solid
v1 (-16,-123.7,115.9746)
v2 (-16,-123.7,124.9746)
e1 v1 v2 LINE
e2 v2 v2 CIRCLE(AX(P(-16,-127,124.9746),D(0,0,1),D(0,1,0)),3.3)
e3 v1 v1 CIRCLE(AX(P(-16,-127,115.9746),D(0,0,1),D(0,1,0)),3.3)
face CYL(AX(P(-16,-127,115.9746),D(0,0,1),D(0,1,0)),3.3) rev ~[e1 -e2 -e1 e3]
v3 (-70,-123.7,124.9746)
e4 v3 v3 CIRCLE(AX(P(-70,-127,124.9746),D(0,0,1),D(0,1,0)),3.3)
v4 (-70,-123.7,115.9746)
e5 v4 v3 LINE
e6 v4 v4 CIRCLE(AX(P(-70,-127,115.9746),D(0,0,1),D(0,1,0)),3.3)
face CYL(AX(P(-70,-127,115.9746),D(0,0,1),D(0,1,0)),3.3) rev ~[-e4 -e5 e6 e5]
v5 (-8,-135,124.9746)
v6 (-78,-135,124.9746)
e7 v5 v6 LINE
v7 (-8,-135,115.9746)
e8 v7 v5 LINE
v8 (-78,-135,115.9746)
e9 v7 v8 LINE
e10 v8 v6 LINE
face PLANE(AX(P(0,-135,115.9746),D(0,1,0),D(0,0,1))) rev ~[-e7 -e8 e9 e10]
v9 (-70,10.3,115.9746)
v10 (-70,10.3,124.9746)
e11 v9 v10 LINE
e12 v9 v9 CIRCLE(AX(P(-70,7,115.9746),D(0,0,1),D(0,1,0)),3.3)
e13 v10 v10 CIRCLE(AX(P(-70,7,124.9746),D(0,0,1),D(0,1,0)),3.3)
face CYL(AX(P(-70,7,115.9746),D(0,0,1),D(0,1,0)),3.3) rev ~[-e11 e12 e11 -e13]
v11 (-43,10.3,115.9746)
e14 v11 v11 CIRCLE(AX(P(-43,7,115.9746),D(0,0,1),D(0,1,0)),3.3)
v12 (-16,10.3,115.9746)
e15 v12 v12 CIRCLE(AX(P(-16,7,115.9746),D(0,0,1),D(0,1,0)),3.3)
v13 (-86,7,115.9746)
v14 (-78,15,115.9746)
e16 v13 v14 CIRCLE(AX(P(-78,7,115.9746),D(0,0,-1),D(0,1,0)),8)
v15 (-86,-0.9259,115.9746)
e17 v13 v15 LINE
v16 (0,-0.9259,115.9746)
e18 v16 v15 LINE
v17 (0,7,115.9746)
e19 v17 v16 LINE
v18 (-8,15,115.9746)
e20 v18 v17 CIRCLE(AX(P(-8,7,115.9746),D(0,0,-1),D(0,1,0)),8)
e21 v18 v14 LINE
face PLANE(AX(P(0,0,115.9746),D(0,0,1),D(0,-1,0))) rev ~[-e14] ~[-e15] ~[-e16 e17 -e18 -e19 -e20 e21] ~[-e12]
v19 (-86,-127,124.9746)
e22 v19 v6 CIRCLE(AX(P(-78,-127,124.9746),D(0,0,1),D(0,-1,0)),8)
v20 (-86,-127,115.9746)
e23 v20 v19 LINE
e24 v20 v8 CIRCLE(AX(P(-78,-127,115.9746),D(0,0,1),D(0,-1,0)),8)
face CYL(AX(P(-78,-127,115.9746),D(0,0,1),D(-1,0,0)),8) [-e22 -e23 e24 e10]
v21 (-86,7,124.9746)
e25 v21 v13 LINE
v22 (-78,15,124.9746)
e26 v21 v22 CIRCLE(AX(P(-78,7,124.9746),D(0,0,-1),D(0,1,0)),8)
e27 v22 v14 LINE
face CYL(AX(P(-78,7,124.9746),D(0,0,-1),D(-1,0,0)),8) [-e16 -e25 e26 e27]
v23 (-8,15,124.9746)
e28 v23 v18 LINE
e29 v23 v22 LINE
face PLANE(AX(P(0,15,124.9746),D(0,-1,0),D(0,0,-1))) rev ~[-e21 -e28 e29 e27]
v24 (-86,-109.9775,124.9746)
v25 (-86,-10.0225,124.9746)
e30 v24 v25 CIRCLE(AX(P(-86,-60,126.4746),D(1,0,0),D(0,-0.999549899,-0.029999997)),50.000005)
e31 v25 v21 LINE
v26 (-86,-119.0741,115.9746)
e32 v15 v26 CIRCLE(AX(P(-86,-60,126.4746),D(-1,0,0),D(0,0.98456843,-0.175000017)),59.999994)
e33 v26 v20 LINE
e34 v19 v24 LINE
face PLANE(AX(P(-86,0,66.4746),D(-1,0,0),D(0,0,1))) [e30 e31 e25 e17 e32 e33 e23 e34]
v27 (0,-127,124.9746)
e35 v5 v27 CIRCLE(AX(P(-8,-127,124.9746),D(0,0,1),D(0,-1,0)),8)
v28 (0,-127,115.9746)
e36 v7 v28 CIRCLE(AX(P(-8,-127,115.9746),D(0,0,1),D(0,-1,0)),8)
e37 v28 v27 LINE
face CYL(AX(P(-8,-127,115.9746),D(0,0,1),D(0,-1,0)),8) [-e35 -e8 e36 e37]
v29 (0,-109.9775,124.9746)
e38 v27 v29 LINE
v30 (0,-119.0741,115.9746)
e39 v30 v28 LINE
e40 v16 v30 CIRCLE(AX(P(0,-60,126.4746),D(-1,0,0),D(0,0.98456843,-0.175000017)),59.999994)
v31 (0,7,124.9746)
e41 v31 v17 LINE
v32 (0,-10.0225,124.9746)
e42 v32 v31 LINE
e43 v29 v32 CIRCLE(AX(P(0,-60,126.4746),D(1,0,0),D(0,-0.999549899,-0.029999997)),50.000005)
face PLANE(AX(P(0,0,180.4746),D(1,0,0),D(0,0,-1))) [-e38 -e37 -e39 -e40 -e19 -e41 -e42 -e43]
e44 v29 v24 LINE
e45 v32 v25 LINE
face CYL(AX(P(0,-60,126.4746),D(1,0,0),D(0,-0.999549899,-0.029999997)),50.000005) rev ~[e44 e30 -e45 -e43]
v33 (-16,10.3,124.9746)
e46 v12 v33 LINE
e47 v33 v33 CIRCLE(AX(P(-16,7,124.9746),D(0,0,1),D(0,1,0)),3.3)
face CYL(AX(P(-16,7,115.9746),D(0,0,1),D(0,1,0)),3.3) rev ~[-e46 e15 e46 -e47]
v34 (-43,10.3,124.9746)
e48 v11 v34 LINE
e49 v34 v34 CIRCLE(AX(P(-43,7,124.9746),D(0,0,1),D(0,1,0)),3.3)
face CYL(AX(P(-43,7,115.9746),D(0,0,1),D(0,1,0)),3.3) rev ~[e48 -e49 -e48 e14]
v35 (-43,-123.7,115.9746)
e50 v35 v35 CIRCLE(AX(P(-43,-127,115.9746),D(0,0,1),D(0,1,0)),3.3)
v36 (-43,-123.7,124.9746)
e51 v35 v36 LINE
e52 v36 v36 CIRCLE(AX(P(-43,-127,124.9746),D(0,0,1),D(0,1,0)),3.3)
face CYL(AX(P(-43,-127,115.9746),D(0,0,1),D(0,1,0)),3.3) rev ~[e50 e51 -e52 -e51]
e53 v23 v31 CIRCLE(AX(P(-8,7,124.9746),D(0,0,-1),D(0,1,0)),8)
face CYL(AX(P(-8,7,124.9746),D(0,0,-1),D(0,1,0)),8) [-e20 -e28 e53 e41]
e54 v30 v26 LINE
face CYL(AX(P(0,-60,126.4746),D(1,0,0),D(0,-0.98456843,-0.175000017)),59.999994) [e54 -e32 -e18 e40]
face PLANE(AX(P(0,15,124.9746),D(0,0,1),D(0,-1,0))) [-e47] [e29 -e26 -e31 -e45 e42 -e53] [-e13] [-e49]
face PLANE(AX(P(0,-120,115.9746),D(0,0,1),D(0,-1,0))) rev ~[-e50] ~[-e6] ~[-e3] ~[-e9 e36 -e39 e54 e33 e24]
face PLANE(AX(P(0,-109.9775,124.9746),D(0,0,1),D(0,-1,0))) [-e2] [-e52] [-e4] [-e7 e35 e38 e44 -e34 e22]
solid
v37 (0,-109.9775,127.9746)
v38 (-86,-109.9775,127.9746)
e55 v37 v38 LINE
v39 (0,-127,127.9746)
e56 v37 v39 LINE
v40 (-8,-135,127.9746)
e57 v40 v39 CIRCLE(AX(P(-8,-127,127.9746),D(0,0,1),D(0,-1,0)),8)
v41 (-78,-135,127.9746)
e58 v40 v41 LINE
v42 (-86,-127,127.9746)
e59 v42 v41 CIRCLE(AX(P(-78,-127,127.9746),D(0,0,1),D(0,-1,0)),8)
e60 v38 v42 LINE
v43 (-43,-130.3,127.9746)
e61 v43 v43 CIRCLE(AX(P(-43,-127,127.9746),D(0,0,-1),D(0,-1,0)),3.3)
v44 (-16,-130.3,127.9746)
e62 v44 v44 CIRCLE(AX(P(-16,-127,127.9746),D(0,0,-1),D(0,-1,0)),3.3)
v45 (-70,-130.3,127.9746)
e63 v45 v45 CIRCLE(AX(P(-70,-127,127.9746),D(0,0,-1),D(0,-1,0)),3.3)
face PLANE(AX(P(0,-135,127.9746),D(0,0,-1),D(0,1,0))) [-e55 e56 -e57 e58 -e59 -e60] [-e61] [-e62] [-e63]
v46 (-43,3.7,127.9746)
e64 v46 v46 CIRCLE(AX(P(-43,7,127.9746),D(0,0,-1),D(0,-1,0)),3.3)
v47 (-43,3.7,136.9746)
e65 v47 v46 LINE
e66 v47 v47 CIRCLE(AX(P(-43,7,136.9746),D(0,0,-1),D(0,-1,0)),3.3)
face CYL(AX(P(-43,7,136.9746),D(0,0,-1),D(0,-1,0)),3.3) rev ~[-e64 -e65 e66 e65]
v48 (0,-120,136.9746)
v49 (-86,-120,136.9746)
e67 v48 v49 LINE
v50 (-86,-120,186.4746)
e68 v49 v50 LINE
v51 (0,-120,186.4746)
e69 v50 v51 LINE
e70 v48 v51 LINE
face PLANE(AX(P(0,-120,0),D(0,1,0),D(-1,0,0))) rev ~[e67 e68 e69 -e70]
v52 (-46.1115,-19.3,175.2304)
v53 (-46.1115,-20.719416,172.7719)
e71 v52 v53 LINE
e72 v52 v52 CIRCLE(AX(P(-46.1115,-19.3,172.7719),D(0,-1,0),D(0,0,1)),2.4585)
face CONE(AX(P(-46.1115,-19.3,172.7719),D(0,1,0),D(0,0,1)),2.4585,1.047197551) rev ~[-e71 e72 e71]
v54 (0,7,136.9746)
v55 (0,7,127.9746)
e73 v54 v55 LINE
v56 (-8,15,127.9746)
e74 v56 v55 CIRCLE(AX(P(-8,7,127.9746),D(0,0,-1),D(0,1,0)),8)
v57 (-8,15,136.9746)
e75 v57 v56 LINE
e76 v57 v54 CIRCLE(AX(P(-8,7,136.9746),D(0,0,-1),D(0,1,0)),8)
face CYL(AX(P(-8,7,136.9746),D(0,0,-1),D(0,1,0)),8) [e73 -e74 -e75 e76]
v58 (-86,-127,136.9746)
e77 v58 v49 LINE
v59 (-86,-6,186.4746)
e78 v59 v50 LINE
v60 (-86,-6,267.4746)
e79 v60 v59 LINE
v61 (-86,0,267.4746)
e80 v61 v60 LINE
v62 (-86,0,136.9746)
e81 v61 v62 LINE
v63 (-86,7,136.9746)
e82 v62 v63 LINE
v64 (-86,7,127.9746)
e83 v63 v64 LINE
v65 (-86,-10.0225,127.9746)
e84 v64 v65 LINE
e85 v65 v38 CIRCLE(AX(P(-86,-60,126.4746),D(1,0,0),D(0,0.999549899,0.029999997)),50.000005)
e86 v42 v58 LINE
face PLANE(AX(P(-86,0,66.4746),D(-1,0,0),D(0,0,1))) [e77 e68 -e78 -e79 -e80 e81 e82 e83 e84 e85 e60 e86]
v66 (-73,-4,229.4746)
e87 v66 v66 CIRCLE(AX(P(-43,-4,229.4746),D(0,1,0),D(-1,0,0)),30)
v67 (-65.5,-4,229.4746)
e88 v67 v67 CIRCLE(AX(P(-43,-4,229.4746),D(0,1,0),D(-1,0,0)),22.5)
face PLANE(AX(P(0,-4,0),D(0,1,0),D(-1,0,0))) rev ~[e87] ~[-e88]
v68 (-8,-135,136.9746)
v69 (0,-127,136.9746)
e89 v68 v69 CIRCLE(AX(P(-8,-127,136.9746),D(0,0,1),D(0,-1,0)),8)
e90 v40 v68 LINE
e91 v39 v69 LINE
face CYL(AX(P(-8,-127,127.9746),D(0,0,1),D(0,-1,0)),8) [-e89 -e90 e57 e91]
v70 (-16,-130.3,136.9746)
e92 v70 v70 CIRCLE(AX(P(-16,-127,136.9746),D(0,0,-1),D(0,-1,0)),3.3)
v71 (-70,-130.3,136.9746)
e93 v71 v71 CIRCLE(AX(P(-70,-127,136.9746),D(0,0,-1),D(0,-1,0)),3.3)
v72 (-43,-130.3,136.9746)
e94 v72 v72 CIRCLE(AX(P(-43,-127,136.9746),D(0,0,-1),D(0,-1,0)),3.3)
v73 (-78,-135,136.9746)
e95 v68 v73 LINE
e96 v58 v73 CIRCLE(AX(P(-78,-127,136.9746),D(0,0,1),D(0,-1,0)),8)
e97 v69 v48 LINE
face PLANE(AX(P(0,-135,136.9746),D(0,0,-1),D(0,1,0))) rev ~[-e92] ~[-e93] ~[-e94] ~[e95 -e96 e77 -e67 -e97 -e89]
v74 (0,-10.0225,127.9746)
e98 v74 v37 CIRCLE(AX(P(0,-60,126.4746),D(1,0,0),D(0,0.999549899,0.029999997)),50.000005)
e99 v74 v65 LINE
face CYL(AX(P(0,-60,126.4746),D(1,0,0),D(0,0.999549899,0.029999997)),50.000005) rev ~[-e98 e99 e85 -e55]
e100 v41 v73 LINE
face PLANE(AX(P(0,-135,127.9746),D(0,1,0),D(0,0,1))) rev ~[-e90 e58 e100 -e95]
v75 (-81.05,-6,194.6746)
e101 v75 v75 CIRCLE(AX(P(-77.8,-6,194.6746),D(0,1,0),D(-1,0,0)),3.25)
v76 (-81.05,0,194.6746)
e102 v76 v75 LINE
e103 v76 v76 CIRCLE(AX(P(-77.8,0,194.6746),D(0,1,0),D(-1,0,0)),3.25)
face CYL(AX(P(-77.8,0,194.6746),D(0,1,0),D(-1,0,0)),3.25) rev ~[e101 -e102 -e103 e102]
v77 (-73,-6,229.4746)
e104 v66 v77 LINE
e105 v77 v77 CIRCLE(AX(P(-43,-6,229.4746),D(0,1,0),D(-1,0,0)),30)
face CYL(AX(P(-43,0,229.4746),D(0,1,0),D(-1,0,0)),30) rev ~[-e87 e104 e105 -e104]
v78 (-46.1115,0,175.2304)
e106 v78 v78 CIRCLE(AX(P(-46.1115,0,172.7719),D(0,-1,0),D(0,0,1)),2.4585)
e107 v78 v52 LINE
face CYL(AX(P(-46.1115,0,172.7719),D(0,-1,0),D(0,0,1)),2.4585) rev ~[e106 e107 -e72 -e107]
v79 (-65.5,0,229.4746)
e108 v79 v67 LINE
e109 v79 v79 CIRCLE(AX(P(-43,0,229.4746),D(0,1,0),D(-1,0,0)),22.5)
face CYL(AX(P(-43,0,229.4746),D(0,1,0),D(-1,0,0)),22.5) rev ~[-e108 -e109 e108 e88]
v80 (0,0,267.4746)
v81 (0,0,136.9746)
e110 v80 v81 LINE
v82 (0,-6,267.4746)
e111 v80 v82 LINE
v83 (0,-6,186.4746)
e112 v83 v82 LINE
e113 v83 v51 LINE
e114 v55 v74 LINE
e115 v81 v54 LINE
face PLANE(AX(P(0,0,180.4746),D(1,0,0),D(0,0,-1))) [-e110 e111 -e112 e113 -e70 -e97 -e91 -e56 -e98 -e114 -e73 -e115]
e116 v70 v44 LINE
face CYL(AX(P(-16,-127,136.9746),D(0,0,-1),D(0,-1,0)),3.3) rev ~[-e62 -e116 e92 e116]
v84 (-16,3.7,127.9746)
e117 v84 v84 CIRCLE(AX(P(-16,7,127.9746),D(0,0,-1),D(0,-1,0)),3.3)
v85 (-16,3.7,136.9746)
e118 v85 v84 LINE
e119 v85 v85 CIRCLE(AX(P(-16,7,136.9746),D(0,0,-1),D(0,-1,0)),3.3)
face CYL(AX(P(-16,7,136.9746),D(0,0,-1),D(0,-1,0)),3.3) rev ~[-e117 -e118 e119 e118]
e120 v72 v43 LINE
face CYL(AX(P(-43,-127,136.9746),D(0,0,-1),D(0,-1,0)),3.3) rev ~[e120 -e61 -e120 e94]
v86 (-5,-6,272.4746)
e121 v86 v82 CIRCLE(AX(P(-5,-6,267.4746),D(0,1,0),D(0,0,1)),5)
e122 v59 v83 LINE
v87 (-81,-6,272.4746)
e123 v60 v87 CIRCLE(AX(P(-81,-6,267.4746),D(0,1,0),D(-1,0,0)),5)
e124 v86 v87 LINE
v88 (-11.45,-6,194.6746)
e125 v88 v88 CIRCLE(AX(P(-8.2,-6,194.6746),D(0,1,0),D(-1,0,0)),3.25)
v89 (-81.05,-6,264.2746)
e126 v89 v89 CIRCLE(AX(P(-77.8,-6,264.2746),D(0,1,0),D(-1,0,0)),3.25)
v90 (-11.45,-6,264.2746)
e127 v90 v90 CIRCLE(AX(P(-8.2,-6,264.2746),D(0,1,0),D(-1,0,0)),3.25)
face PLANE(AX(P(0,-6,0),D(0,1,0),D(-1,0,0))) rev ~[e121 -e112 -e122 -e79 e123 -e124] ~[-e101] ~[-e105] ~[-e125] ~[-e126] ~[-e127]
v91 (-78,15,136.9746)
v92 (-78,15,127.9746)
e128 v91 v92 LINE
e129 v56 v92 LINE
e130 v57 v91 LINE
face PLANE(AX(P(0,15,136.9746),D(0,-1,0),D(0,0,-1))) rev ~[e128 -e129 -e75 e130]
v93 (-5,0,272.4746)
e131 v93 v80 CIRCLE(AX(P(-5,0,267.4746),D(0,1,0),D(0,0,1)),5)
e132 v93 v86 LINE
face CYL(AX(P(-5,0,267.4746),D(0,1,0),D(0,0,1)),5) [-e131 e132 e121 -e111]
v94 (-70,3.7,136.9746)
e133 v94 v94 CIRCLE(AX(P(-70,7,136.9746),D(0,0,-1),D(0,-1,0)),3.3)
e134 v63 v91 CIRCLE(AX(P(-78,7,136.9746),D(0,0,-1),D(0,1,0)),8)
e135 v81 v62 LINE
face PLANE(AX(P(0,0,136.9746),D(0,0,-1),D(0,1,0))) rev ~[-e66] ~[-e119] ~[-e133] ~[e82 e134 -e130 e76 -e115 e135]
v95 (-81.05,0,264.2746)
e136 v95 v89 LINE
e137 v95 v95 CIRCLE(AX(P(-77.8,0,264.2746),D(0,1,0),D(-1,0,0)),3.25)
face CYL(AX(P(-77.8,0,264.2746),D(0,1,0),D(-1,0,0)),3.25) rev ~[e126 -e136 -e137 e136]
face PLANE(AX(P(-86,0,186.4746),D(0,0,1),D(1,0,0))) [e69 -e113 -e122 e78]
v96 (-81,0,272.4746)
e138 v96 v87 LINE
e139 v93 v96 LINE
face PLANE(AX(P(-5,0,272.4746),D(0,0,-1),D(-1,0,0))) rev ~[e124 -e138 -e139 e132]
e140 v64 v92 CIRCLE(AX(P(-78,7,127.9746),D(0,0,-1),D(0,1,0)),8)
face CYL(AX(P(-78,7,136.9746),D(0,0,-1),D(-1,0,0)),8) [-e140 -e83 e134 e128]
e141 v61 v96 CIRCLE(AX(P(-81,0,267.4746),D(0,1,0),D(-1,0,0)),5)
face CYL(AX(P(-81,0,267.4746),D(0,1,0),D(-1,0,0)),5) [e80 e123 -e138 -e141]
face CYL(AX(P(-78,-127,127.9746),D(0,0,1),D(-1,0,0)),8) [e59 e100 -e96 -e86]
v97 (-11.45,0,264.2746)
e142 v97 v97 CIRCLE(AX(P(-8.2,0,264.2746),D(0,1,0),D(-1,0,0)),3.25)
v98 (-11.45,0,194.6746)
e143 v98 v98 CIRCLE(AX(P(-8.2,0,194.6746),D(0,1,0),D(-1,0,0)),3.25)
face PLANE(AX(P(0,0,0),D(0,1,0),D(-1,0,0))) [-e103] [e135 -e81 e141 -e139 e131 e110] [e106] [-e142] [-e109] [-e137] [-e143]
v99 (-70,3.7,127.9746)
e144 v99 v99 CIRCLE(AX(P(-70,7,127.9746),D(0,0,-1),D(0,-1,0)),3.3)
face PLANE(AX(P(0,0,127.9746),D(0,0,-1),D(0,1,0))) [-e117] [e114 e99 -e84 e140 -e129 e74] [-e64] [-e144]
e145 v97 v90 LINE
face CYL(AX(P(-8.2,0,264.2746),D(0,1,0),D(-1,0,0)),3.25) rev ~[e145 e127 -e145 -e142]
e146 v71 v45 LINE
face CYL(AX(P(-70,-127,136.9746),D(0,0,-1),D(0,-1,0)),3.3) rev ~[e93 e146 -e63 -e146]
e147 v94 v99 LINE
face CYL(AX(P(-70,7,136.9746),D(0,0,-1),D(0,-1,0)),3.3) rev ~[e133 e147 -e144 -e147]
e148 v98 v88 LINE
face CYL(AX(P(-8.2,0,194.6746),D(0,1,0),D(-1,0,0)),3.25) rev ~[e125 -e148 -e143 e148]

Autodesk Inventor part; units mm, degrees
ref_plane "YZ Plane" through (0, 0, 0) normal (1, 0, 0) x (0, 1, 0)
ref_plane "XZ Plane" through (0, 0, 0) normal (0, 1, 0) x (-1, 0, 0)
ref_plane "XY Plane" through (0, 0, 0) normal (0, 0, 1) x (1, 0, 0)
sketch "Szkic1" plane through (0, 0, 0) normal (0, 1, 0) x (-1, 0, 0)
  line L0 (5, 272.4746) -> (81, 272.4746)
  line L1 (86, 267.4746) -> (86, 186.4746)
  line L2 (86, 186.4746) -> (0, 186.4746)
  line L3 (0, 186.4746) -> (0, 267.4746)
  line L4 (0, 186.4746) -> (0, 180.4746)
  line L5 (0, 180.4746) -> (86, 180.4746)
  line L6 (86, 180.4746) -> (86, 186.4746)
  line L7 (0, 180.4746) -> (0, 66.4746)
  line L8 (0, 66.4746) -> (86, 66.4746)
  line L9 (86, 66.4746) -> (86, 180.4746)
  circle A0 centre (43, 229.4746) radius 30
  line L10 (77.8, 264.2746) -> (8.2, 194.6746) construction
  line L11 (8.2, 264.2746) -> (77.8, 194.6746) construction
  circle A1 centre (77.8, 264.2746) radius 3.25
  circle A2 centre (8.2, 264.2746) radius 3.25
  circle A3 centre (8.2, 194.6746) radius 3.25
  circle A4 centre (77.8, 194.6746) radius 3.25
  circle A5 centre (43, 229.4746) radius 22.5
  arc A6 (5, 272.4746) -> (0, 267.4746) centre (5, 267.4746) ccw
  arc A7 (86, 267.4746) -> (81, 272.4746) centre (81, 267.4746) ccw
  point P0 (0, 0)
  point P1 (0, 272.4746)
  point P2 (86, 272.4746)
  dimension "d0" = 86
  dimension "d1" = 86
  dimension "d2" = 6
  dimension "d3" = 114
  dimension "d4" = 86
  dimension "d22" = 60
  dimension "d23" = 69.6
  dimension "d24" = 69.6
  dimension "d25" = 6.5
  dimension "d26" = 6.5
  dimension "d27" = 6.5
  dimension "d28" = 6.5
  dimension "d29" = 45
  dimension "d32" = 5
extrude "Wyciągnięcie proste1" add sketch "Szkic1" against normal blind 6 contours L0 A7 L1 L2 L3 A6
extrude "Wyciągnięcie proste2" add sketch "Szkic1" against normal blind 120 contours L2 L6 L5 L4
extrude "Wyciągnięcie proste3" add sketch "Szkic1" against normal blind 120 contours L5 L9 L8 L7
sketch "Szkic3" plane through (0, -120, 186.4746) normal (1, 0, 0) x (0, 0, -1)
  line L0 (49.5, 135) -> (70.5, 135)
  line L1 (49.5, 135) -> (70.5, -15) construction
  line L2 (70.5, 135) -> (49.5, -15) construction
  line L3 (0, 0) -> (120, 0) projected
  line L4 (120, 120) -> (120, 0)
  line L5 (120, 0) -> (0, 0)
  line L6 (0, 0) -> (0, 120)
  line L7 (0, 120) -> (120, 0) construction
  line L8 (120, 120) -> (0, 0) construction
  line L9 (49.5, -15) -> (49.5, 0)
  line L10 (49.5, 120) -> (49.5, 135)
  line L11 (70.5, 135) -> (70.5, 119.0741)
  line L12 (70.5, 0.9259) -> (70.5, -15)
  arc A0 (70.5, 0.9259) -> (70.5, 119.0741) centre (60, 60) ccw
  line L13 (58.5, 135) -> (61.5, 135)
  line L14 (61.5, -15) -> (58.5, 135) construction
  line L15 (58.5, -15) -> (61.5, 135) construction
  line L16 (70.5, -15) -> (61.5, -15)
  line L17 (58.5, -15) -> (49.5, -15)
  line L18 (58.5, -15) -> (58.5, 10.0225)
  line L19 (61.5, 10.0225) -> (61.5, -15)
  line L20 (61.5, 135) -> (61.5, 109.9775)
  line L21 (58.5, 109.9775) -> (58.5, 135)
  arc A1 (61.5, 10.0225) -> (61.5, 109.9775) centre (60, 60) ccw
  arc A2 (58.5, 109.9775) -> (58.5, 10.0225) centre (60, 60) ccw
  line L22 (0, 120) -> (58.5, 120)
  line L23 (61.5, 120) -> (120, 120)
  line L24 (58.5, -15) -> (61.5, -15)
  point P0 (186.4746, 120)
  point P1 (70.5, 0)
  point P2 (61.5, 0)
  point P3 (58.5, 0)
  point P4 (49.5, 0)
  point P5 (70.5, 120)
  point P6 (120, 60)
extrude "Wyciągnięcie proste4" add sketch "Szkic3" against normal blind 86 contours L0 L21 L22 L10 | L0 L11 L23 L20 | L3 L18 L17 L9 | L3 L12 L16 L19
extrude "Wyciągnięcie proste5" cut sketch "Szkic3" against normal blind 86 contours L0 L20 A1 L19 L3 L18 A2 L21 | L23 L4 A0 L11 | L3 L19 L24 L18 | L4 L3 L12 A0
fillet "Zaokrąglenie1" radius 8 8 edges at (-86, 15, 120.4746) (-86, 15, 132.4746) (0, 15, 120.4746) (0, 15, 132.4746) (-86, -135, 120.4746) (-86, -135, 132.4746) (0, -135, 120.4746) (0, -135, 132.4746)
extrude "Wyciągnięcie proste6" add sketch "Szkic1" against normal blind 4 contours A0
sketch "Szkic4" plane through (-86, 0, 136.9746) normal (0, 0, 1) x (1, 0, 0)
  point P0 (70, 7)
hole "Otwór1" at (-16, 7, 136.9746) direction (0, 0, -1) diameter 6.6 depth 9
sketch "Szkic5" plane through (0, -0.9259, 115.9746) normal (0, 0, -1) x (-1, 0, 0)
  point P0 (16, 7.9259)
hole "Otwór2" at (-16, 7, 115.9746) direction (0, 0, 1) diameter 6.6 depth 9
sketch "Szkic6" plane through (-86, 0, 136.9746) normal (0, 0, 1) x (1, 0, 0)
  point P0 (16, 7)
hole "Otwór3" at (-70, 7, 136.9746) direction (0, 0, -1) diameter 6.6 depth 9
sketch "Szkic7" plane through (0, -0.9259, 115.9746) normal (0, 0, -1) x (-1, 0, 0)
  point P0 (70, 7.9259)
hole "Otwór4" at (-70, 7, 115.9746) direction (0, 0, 1) diameter 6.6 depth 9
sketch "Szkic8" plane through (-86, 0, 136.9746) normal (0, 0, 1) x (1, 0, 0)
  point P0 (43, 7)
hole "Otwór5" at (-43, 7, 136.9746) direction (0, 0, -1) diameter 6.6 depth 9
sketch "Szkic9" plane through (0, -0.9259, 115.9746) normal (0, 0, -1) x (-1, 0, 0)
  point P0 (43, 7.9259)
hole "Otwór6" at (-43, 7, 115.9746) direction (0, 0, 1) diameter 6.6 depth 9
sketch "Szkic10" plane through (-86, -120, 136.9746) normal (0, 0, 1) x (1, 0, 0)
  point P0 (16, -7)
hole "Otwór7" at (-70, -127, 136.9746) direction (0, 0, -1) diameter 6.6 depth 9
sketch "Szkic11" plane through (0, -119.0741, 115.9746) normal (0, 0, -1) x (-1, 0, 0)
  point P0 (70, -7.9259)
hole "Otwór8" at (-70, -127, 115.9746) direction (0, 0, 1) diameter 6.6 depth 9
sketch "Szkic12" plane through (-86, -120, 136.9746) normal (0, 0, 1) x (1, 0, 0)
  point P0 (70, -7)
hole "Otwór9" at (-16, -127, 136.9746) direction (0, 0, -1) diameter 6.6 depth 9
sketch "Szkic13" plane through (0, -119.0741, 115.9746) normal (0, 0, -1) x (-1, 0, 0)
  point P0 (16, -7.9259)
hole "Otwór10" at (-16, -127, 115.9746) direction (0, 0, 1) diameter 6.6 depth 9
sketch "Szkic14" plane through (-86, -120, 136.9746) normal (0, 0, 1) x (1, 0, 0)
  point P0 (43, -7)
hole "Otwór11" at (-43, -127, 136.9746) direction (0, 0, -1) diameter 6.6 depth 9
sketch "Szkic15" plane through (0, -119.0741, 115.9746) normal (0, 0, -1) x (-1, 0, 0)
  point P0 (43, -7.9259)
hole "Otwór12" at (-43, -127, 115.9746) direction (0, 0, 1) diameter 6.6 depth 9
sketch "Szkic16" plane through (0, 0, 0) normal (0, 1, 0) x (1, 0, 0)
  point P0 (-46.1115, -172.7719)
hole "Otwór13" at (-46.1115, 0, 172.7719) direction (0, -1, 0) diameter 4.917 depth 19.3 tip angle 120 thread size "M6x1" class "6H" standard "ISO Metric profile"
properties part number "mocowanie_silnika_członu_3" material "Tytan"
